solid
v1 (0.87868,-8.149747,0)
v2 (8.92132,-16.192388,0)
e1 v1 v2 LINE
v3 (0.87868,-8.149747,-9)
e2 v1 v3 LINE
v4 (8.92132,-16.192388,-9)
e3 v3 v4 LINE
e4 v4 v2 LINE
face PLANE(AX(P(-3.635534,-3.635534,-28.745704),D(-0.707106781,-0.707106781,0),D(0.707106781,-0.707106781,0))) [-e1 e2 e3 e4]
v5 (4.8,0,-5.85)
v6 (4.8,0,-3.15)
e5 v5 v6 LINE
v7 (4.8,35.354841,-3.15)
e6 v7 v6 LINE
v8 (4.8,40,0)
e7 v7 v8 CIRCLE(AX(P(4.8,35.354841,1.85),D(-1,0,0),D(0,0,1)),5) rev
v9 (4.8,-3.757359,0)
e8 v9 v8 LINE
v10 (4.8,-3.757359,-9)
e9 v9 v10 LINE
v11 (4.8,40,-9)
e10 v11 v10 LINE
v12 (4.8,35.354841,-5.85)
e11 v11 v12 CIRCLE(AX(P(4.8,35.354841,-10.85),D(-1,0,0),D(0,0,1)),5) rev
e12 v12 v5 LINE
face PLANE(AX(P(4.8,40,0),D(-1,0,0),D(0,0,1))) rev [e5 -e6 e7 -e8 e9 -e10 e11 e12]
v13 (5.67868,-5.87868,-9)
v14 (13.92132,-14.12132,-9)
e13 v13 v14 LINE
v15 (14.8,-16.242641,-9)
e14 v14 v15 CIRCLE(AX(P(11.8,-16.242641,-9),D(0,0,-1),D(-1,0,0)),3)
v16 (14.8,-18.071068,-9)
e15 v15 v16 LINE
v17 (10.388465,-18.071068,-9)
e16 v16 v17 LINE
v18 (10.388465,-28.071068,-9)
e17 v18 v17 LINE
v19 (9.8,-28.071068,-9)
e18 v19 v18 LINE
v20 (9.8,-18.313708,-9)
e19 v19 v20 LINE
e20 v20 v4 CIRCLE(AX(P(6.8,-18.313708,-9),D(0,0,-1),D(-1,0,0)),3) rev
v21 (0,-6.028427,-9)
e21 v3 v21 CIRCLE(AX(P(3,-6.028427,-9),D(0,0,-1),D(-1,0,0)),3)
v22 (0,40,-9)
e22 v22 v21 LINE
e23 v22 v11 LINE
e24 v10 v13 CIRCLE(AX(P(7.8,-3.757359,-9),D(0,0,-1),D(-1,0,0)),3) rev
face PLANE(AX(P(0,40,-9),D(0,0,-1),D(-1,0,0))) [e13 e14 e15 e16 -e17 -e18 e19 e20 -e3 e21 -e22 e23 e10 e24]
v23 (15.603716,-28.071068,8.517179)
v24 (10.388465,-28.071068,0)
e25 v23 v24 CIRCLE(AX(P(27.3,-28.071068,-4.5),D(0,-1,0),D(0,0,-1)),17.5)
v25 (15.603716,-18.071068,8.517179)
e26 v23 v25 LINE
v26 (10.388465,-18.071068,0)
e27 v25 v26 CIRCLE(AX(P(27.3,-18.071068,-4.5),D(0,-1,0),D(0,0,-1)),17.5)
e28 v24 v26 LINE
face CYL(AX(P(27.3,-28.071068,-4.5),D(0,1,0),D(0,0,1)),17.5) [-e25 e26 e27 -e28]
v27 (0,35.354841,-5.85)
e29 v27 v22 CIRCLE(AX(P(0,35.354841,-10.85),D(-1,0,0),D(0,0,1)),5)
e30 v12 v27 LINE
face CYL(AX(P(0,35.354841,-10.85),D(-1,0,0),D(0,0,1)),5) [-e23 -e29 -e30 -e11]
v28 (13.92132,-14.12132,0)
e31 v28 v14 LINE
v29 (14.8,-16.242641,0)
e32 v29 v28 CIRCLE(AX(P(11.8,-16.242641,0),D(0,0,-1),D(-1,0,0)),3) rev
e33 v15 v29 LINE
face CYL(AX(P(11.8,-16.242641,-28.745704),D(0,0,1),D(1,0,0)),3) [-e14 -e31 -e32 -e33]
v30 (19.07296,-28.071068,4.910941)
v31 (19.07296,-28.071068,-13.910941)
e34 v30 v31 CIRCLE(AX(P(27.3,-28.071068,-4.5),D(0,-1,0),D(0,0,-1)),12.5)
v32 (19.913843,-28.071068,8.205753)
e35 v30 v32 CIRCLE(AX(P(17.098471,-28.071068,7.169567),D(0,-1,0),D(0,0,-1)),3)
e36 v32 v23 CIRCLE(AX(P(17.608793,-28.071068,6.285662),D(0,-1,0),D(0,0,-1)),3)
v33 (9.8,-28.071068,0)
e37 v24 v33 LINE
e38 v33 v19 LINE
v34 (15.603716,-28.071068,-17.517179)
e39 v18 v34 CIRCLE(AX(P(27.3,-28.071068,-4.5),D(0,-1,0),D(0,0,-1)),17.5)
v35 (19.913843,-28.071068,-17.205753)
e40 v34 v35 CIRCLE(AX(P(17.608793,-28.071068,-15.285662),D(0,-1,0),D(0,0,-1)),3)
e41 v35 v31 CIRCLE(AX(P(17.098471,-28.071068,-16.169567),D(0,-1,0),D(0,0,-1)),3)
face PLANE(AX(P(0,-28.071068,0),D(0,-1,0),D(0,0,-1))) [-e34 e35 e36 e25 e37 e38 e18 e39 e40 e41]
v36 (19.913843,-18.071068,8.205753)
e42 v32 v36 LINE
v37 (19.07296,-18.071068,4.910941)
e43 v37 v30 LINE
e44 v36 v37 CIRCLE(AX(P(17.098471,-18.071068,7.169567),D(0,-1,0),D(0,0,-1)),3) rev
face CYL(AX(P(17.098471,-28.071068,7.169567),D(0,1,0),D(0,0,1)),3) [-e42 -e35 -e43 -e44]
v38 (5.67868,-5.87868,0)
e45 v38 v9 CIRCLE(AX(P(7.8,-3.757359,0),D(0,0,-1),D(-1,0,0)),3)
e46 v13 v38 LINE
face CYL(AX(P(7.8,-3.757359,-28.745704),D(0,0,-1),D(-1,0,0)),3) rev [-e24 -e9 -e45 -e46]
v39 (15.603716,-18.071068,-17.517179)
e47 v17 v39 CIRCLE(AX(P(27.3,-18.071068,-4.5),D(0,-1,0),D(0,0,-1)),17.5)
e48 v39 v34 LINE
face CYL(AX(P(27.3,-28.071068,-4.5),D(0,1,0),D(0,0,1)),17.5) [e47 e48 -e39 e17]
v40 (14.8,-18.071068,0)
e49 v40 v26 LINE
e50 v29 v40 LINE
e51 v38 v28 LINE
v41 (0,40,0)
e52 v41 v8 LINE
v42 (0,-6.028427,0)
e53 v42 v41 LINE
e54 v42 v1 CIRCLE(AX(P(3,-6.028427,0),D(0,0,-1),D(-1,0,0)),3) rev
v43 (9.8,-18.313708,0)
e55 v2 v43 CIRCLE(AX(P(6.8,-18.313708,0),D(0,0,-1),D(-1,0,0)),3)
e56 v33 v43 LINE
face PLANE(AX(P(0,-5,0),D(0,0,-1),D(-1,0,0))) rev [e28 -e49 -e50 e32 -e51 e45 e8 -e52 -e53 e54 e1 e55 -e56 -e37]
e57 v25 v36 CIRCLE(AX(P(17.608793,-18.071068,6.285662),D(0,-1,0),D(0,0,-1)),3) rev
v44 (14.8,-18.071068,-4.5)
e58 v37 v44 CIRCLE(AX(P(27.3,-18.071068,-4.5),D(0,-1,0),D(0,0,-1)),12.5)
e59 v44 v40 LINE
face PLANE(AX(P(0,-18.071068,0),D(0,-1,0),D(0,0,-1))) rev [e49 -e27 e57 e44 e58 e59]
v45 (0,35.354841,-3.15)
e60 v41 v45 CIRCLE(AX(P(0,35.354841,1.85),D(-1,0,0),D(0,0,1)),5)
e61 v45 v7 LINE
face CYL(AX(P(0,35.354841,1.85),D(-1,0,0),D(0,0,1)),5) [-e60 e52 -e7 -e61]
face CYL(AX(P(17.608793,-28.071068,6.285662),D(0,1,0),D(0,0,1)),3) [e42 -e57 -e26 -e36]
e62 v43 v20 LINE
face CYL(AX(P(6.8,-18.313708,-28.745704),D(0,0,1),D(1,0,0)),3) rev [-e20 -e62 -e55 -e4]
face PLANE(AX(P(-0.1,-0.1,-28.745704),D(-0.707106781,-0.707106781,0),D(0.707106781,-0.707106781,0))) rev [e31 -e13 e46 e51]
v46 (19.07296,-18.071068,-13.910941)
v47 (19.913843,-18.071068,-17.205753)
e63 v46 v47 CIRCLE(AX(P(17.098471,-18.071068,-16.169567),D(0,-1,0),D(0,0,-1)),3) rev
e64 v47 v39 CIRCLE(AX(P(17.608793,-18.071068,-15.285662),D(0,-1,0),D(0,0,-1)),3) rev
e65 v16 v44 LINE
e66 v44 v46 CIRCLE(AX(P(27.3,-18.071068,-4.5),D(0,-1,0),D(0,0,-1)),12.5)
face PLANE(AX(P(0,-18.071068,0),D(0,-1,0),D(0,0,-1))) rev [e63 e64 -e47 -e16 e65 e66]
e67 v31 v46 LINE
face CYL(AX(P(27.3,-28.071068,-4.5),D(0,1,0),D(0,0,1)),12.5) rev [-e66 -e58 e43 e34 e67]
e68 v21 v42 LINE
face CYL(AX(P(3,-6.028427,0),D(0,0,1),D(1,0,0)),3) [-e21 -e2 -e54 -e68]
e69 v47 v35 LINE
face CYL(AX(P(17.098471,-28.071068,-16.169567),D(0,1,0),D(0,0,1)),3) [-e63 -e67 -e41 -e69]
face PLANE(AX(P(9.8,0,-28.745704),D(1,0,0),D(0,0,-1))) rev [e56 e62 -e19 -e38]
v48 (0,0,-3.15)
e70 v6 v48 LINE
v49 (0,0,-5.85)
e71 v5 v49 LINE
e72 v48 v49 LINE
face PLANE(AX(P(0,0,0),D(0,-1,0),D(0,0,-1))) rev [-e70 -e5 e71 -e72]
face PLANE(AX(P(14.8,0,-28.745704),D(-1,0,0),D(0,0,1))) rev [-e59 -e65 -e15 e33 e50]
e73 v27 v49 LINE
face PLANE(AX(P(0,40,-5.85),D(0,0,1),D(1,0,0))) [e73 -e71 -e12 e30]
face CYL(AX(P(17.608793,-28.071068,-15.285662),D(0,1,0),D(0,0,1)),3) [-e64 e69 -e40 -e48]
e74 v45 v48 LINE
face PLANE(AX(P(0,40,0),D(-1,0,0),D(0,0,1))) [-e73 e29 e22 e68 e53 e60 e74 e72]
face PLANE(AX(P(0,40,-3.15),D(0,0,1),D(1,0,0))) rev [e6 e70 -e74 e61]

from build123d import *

# Parameters (mm, degrees)
SKETCH1_W             = 4.8
SKETCH1_H             = 3.15
BOSS_EXTRUDE1_DEPTH   = 40
BOSS_EXTRUDE1_2_DEPTH = 40
SKETCH2_W             = 4.8
SKETCH2_H             = 9
BOSS_EXTRUDE2_DEPTH   = 5
BOSS_EXTRUDE3_DEPTH   = 9
BOSS_EXTRUDE4_DEPTH   = 10
FILLET1_R             = 5
FILLET2_R             = 3
FILLET3_R             = 3


with BuildPart() as part:
    # Sketch1 → Boss-Extrude1 (new body)
    with BuildSketch(Plane(origin=(0, 0, 0), x_dir=(1, 0, 0), z_dir=(0, 1, 0))):
        with Locations((2.4, 7.425)):
            Rectangle(SKETCH1_W, SKETCH1_H)
    extrude(amount=BOSS_EXTRUDE1_DEPTH)



with BuildPart() as body_2:
    # Sketch1 → Boss-Extrude1 2 (new body)
    with BuildSketch(Plane(origin=(0, 0, 0), x_dir=(1, 0, 0), z_dir=(0, 1, 0))):
        with Locations((2.4, 1.575)):
            Rectangle(SKETCH1_W, SKETCH1_H)
    extrude(amount=BOSS_EXTRUDE1_2_DEPTH)


with BuildPart() as part_1:
    add(part.part)

    add(body_2.part)  # Boss-Extrude2 merges body 2
    # Sketch2 → Boss-Extrude2 (add)
    with BuildSketch(Plane.XZ):
        with Locations((2.4, -4.5)):
            Rectangle(SKETCH2_W, SKETCH2_H)
    extrude(amount=BOSS_EXTRUDE2_DEPTH)

    # Sketch3 → Boss-Extrude3 (add)
    with BuildSketch(Plane(origin=(4, 0, 0), x_dir=(-1, 0, 0), z_dir=(0, 0, -1))):
        Polygon((-5.8, -17.071067812), (4, -7.271067812), (4, -5), (-0.8, -5), (-10.8, -15), (-10.8, -18.071067812), (-5.8, -18.071067812), align=None)
    extrude(amount=BOSS_EXTRUDE3_DEPTH)

    # Sketch4 → Boss-Extrude4 (add)
    with BuildSketch(Plane.XZ.offset(18.071067812)):
        with BuildLine():
            Line((9.8, 0), (9.8, -4.5))
            ThreePointArc((9.8, -4.5), (9.94774, -2.230843129), (10.388465475, 0))
            Line((10.388465475, 0), (9.8, 0))
        make_face()
        with BuildLine():
            ThreePointArc((10.388465475, -9), (9.94774, -6.769156871), (9.8, -4.5))
            Line((9.8, -4.5), (9.8, -9))
            Line((9.8, -9), (10.388465475, -9))
        make_face()
        with BuildLine():
            ThreePointArc((21.05, -15.325317547), (16.474682453, -10.75), (14.8, -4.5))
            Line((14.8, -4.5), (14.8, -9))
            Line((14.8, -9), (10.388465475, -9))
            ThreePointArc((10.388465475, -9), (13.407080463, -15.141277495), (18.55, -19.655444566))
            Line((18.55, -19.655444566), (21.05, -15.325317547))
        make_face()
        with BuildLine():
            Line((14.8, -9), (14.8, -4.5))
            Line((14.8, -4.5), (9.8, -4.5))
            ThreePointArc((9.8, -4.5), (9.94774, -6.769156871), (10.388465475, -9))
            Line((10.388465475, -9), (14.8, -9))
        make_face()
        with BuildLine():
            Line((9.8, -4.5), (14.8, -4.5))
            Line((14.8, -4.5), (14.8, 0))
            Line((14.8, 0), (10.388465475, 0))
            ThreePointArc((10.388465475, 0), (9.94774, -2.230843129), (9.8, -4.5))
        make_face()
        with BuildLine():
            Line((14.8, 0), (14.8, -4.5))
            ThreePointArc((14.8, -4.5), (16.474682453, 1.75), (21.05, 6.325317547))
            Line((21.05, 6.325317547), (18.55, 10.655444566))
            ThreePointArc((18.55, 10.655444566), (13.407080463, 6.141277495), (10.388465475, 0))
            Line((10.388465475, 0), (14.8, 0))
        make_face()
    extrude(amount=BOSS_EXTRUDE4_DEPTH)

    # Fillet1
    # the kernel refuses this fillet: 5 mm, written as the material it takes off along each edge
    with BuildSketch(Plane(origin=(16.412896925, 40, -3.15), x_dir=(0, 0, 1), z_dir=(-1, 0, 0))) as fillet1_piece_1:
        with BuildLine():
            CenterArc((5, -4.64515877), FILLET1_R, 111.715617283, 68.284382717)
            Line((0, -4.64515877), (-0.1, -4.64515877))
            Line((-0.1, -4.64515877), (-0.1, 0))
            Line((-0.1, 0), (0, 0.1))
            ThreePointArc((0, 0.1), (1.575, 0.1), (3.113, 0.092903175))
            Line((3.113, 0.092903175), (3.15, 0))
        make_face()
    extrude(amount=28.025793851, mode=Mode.SUBTRACT)
    with BuildSketch(Plane(origin=(-11.612896925, 40, -5.85), x_dir=(0, -1, 0), z_dir=(1, 0, 0))) as fillet1_piece_2:
        with BuildLine():
            CenterArc((4.64515877, 5), FILLET1_R, 201.715617283, 68.284382717)
            Line((0, 3.15), (-0.092903175, 3.113))
            ThreePointArc((-0.092903175, 3.113), (-0.1, 1.575), (-0.1, 0))
            Line((-0.1, 0), (0, -0.1))
            Line((0, -0.1), (4.64515877, -0.1))
            Line((4.64515877, -0.1), (4.64515877, 0))
        make_face()
    extrude(amount=28.025793851, mode=Mode.SUBTRACT)

    # Fillet2
    # the kernel refuses this fillet: 3 mm, written as the material it takes off along each edge
    with BuildSketch(Plane(origin=(21.05, -11.303801998, 6.325317547), x_dir=(-0.8133042312871992, 0, -0.581838660945058), z_dir=(0, -1, 0))) as fillet2_piece_1:
        with BuildLine():
            CenterArc((2.722578478, -2.985784367), FILLET2_R, 95.579968436, 78.840063128)
            Line((-0.263205889, -2.69407953), (0, 0))
            ThreePointArc((0, 0), (1.21543682, -0.059231803), (2.430873641, 0))
        make_face()
    extrude(amount=23.534531629, mode=Mode.SUBTRACT)
    with BuildSketch(Plane(origin=(21.05, -11.303801998, -15.325317547), x_dir=(-0.4999999999999966, 0, -0.8660254037844407), z_dir=(0, -1, 0))) as fillet2_piece_2:
        with BuildLine():
            CenterArc((2.706906326, -3), FILLET2_R, 90, 78.840063128)
            ThreePointArc((-0.236365866, -2.419354839), (-0.059231803, -1.21543682), (0, 0))
            Line((0, 0), (2.706906326, 0))
        make_face()
    extrude(amount=23.534531629, mode=Mode.SUBTRACT)
    with BuildSketch(Plane(origin=(18.55, -8.969979336, -19.655444566), x_dir=(-0.8093218589148085, 0, 0.5873654132502858), z_dir=(0, -1, 0))) as fillet2_piece_3:
        with BuildLine():
            CenterArc((3.328398071, -2.983727989), FILLET2_R, 84.02972802, 101.940543961)
            Line((0.344670082, -3.295765308), (0, 0))
            ThreePointArc((0, 0), (1.820217695, 0.094920065), (3.64043539, 0))
        make_face()
    extrude(amount=28.202176951, mode=Mode.SUBTRACT)
    with BuildSketch(Plane(origin=(18.55, -8.969979336, 10.655444566), x_dir=(-0.8093218589148087, 0, -0.5873654132502856), z_dir=(0, -1, 0))) as fillet2_piece_4:
        with BuildLine():
            CenterArc((3.328398071, 2.983727989), FILLET2_R, 174.02972802, 101.940543961)
            Line((0.344670082, 3.295765308), (0, 0))
            ThreePointArc((0, 0), (1.820217695, -0.094920065), (3.64043539, 0))
        make_face()
    extrude(amount=28.202176951, mode=Mode.SUBTRACT)

    # Fillet3
    fillet3_edges = [part_1.edges().sort_by_distance(p)[0] for p in [
        (4.8, -5, -4.5),
        (9.8, -17.071067812, -4.5),
        (0, -7.271067812, -4.5),
        (14.8, -15, -4.5),
    ]]
    fillet(fillet3_edges, radius=FILLET3_R)


solid = part_1.part
